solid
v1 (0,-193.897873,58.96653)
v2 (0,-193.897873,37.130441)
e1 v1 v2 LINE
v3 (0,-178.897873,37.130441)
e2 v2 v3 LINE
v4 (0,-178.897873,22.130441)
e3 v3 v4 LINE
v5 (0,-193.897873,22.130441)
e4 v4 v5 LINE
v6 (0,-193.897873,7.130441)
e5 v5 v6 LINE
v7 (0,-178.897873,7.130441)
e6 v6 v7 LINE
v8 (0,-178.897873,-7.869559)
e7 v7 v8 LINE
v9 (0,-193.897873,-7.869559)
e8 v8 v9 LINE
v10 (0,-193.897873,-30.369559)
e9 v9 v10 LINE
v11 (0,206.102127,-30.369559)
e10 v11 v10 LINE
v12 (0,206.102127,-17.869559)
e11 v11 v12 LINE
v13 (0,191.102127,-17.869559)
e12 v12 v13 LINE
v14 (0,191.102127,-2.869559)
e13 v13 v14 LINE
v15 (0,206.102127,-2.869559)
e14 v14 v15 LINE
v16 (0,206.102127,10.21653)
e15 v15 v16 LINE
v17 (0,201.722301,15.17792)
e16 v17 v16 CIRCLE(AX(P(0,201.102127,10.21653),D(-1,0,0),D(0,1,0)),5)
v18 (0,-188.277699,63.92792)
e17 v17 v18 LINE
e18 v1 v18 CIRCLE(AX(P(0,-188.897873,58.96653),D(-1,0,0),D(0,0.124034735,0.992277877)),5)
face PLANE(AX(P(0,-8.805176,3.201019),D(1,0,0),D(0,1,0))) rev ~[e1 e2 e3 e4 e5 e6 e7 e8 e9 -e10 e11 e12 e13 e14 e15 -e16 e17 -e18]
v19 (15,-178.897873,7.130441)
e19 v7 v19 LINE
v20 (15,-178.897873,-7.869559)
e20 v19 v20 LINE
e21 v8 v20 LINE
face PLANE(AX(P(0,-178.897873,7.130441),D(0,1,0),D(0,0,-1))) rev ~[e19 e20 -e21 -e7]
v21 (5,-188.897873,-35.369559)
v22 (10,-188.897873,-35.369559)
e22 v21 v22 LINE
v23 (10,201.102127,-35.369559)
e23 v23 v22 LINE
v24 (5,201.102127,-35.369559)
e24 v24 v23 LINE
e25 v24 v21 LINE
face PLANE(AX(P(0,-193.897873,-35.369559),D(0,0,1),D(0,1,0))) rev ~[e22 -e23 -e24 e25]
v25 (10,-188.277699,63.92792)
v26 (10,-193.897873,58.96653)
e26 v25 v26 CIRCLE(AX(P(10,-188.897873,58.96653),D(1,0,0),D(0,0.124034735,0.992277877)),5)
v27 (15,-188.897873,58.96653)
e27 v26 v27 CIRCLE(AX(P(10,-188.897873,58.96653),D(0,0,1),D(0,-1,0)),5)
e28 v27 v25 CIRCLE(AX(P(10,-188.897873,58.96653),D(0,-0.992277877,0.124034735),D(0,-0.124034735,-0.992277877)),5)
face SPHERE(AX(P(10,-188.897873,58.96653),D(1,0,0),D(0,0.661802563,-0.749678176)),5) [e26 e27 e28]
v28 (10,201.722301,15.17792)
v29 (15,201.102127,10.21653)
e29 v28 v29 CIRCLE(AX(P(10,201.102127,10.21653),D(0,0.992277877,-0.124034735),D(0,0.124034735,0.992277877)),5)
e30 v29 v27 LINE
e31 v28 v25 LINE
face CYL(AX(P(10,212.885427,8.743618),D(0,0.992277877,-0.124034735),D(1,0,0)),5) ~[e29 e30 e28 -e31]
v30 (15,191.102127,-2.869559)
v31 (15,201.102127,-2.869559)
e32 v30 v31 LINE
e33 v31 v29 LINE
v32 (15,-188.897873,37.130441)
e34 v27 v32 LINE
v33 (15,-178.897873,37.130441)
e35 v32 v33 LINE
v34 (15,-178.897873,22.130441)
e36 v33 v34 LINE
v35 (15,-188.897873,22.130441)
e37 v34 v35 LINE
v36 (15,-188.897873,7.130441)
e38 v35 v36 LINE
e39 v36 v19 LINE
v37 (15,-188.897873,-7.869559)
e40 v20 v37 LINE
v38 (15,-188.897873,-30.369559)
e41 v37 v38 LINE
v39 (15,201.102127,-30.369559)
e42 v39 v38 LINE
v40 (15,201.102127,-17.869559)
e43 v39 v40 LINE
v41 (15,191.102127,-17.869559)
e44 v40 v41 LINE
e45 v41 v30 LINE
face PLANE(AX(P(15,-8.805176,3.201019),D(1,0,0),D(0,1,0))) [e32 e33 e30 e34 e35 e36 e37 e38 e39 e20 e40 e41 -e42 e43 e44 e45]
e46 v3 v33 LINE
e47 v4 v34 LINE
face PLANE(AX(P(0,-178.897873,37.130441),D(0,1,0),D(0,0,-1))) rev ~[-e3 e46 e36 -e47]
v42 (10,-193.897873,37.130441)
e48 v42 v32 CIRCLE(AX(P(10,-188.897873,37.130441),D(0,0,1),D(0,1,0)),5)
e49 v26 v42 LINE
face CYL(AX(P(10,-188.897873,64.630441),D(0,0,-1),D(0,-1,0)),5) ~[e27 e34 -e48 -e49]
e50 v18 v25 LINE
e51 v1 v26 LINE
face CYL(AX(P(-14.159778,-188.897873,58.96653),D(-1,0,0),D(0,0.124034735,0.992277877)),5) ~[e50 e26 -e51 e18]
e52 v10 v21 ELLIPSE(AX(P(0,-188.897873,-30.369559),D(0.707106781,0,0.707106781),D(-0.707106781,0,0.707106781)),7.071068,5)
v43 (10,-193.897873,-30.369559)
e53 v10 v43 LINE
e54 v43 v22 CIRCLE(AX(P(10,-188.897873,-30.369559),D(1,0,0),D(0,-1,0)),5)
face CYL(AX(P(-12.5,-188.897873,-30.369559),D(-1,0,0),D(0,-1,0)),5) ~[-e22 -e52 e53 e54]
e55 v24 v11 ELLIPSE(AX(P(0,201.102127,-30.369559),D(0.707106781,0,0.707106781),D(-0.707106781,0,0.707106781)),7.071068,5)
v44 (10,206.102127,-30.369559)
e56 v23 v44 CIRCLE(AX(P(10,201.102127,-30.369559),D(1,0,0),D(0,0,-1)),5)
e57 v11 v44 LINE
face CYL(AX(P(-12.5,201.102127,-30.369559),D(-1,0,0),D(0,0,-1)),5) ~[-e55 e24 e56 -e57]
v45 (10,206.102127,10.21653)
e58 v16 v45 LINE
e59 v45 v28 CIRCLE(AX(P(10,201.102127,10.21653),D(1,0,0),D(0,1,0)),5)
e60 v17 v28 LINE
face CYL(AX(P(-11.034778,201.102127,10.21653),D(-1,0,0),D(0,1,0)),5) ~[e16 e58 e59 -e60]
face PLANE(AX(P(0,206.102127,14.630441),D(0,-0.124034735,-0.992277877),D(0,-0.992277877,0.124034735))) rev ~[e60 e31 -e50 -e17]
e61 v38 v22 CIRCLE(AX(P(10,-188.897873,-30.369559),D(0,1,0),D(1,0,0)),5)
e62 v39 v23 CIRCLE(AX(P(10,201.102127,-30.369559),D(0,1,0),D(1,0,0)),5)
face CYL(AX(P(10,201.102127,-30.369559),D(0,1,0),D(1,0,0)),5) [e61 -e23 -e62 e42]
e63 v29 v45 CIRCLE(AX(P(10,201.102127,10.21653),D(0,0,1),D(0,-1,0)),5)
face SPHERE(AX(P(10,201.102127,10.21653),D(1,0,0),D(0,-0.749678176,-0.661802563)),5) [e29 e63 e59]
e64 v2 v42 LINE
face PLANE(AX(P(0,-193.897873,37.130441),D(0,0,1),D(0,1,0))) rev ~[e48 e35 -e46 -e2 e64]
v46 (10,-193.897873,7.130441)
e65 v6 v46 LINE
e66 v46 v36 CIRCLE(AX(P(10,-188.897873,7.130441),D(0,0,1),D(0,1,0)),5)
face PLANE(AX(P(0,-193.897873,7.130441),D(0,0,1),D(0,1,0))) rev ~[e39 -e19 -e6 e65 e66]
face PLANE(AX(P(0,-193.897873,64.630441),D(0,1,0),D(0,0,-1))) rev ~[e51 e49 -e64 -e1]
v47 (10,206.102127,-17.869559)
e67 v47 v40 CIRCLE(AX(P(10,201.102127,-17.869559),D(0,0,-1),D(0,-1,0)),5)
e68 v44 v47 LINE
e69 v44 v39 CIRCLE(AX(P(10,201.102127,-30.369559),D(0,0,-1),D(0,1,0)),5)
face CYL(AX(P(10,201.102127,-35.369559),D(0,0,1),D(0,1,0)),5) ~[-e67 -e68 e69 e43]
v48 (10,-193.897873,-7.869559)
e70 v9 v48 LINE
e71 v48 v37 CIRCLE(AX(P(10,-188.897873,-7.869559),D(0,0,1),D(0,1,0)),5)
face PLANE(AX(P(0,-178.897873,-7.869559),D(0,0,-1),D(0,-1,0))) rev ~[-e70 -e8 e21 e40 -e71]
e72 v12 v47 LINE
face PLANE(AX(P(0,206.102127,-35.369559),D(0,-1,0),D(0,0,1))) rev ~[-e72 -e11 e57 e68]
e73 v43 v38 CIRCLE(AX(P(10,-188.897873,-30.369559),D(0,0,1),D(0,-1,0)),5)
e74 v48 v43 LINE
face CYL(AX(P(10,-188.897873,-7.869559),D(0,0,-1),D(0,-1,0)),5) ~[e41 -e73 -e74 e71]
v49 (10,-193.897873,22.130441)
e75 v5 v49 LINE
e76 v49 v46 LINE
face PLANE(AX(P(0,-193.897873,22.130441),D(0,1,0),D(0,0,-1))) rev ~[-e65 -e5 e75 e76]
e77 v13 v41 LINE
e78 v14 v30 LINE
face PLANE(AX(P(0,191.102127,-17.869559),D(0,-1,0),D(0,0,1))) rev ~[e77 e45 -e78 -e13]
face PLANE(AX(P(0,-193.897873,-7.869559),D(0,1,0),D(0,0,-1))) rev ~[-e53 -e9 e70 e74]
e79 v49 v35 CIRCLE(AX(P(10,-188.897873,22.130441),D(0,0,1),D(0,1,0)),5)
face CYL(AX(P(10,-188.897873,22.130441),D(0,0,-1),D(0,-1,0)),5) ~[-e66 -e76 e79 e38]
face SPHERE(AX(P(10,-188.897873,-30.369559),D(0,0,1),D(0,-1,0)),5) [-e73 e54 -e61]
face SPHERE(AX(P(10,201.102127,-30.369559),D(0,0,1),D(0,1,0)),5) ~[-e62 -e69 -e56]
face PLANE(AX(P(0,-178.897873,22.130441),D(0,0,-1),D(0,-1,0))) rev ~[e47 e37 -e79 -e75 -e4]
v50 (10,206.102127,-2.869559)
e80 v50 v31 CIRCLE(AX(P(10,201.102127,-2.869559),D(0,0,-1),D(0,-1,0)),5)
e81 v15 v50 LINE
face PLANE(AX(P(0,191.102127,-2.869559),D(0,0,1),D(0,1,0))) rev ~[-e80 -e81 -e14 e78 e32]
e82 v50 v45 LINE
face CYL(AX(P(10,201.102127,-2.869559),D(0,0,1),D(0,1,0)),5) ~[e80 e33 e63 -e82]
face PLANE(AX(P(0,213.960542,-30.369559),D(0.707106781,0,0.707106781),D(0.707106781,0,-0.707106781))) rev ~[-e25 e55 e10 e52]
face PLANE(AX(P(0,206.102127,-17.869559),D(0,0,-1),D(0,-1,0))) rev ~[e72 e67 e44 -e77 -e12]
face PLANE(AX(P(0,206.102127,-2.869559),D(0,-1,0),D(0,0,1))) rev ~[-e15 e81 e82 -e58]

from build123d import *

# Parameters (mm, degrees)
F1_DEPTH     = 15
F2_R         = 5
F3_T1_DEPTH  = 418.0350652296
F4_T1_DEPTH  = 390
F4_T3_DEPTH  = 22.5
F4_T5_DEPTH  = 21.0347777317
F4_T7_DEPTH  = 24.1597777317
F4_T12_DEPTH = 5
F4_T18_DEPTH = 5
F4_T22_ANGLE = 90
F4_T24_ANGLE = 90
F5_T1_DEPTH  = 415.7168298797


# Not quite as in the source:
# - a fillet or chamfer that OpenCascade refuses, or shapes differently, is made with other operations: its cross-section is extruded or revolved along the edge and cut away or added


with BuildPart() as f1:
    # F0 (on Right) → F1 (new body)
    with BuildSketch(Plane.YZ):
        Polygon((-193.8978725672, -35.3695585671), (206.1021274328, -35.3695585671), (206.1021274328, -17.8695585671), (191.1021274328, -17.8695585671), (191.1021274328, -2.8695585671), (206.1021274328, -2.8695585671), (206.1021274328, 14.6304414329), (-193.8978725672, 64.6304414329), (-193.8978725672, 37.1304414329), (-178.8978725672, 37.1304414329), (-178.8978725672, 22.1304414329), (-193.8978725672, 22.1304414329), (-193.8978725672, 7.1304414329), (-178.8978725672, 7.1304414329), (-178.8978725672, -7.8695585671), (-193.8978725672, -7.8695585671), align=None)
    extrude(amount=F1_DEPTH)

    # F2
    f2_edges = [f1.edges().sort_by_distance(p)[0] for p in [
        (15, 206.102127, 5.880441),
        (15, 206.102127, -26.619559),
        (15, -193.897873, -21.619559),
        (15, -193.897873, 14.630441),
        (15, -193.897873, 50.880441),
    ]]
    fillet(f2_edges, radius=F2_R)

    # F3: fillet of radius 5 on 1 edges, made by hand

    # F3_s2 → F3_t1 (cut)
    with BuildSketch(Plane(origin=(0, 208.5341292164, -26.0667661521), x_dir=(1, 0, 0), z_dir=(0, -0.9922778767, 0.1240347346))):
        with BuildLine():
            ThreePointArc((15, 35.0812860348), (13.5355339059, 38.6168199408), (10, 40.0812860348))
            Line((10, 40.0812860348), (15, 40.0812860348))
            Line((15, 40.0812860348), (15, 35.0812860348))
        make_face()
    extrude(amount=F3_T1_DEPTH, mode=Mode.SUBTRACT)

    # F4: fillet of radius 5 on 7 edges, made by hand

    # F4_s2 → F4_t1 (cut)
    with BuildSketch(Plane.XZ.offset(-201.1021274328)):
        with BuildLine():
            ThreePointArc((15, -30.3695585671), (13.5355339059, -33.905092473), (10, -35.3695585671))
            Line((10, -35.3695585671), (15, -35.3695585671))
            Line((15, -35.3695585671), (15, -30.3695585671))
        make_face()
    extrude(amount=F4_T1_DEPTH, mode=Mode.SUBTRACT)

    # F4_s4 → F4_t3 (cut)
    with BuildSketch(Plane.YZ.offset(-12.5)):
        with BuildLine():
            ThreePointArc((-193.8978725672, -30.3695585671), (-192.4334064731, -33.905092473), (-188.8978725672, -35.3695585671))
            Line((-188.8978725672, -35.3695585671), (-193.8978725672, -35.3695585671))
            Line((-193.8978725672, -35.3695585671), (-193.8978725672, -30.3695585671))
        make_face()
        with BuildLine():
            ThreePointArc((201.1021274328, -35.3695585671), (204.6376613388, -33.905092473), (206.1021274328, -30.3695585671))
            Line((206.1021274328, -30.3695585671), (206.1021274328, -35.3695585671))
            Line((206.1021274328, -35.3695585671), (201.1021274328, -35.3695585671))
        make_face()
    extrude(amount=F4_T3_DEPTH, mode=Mode.SUBTRACT)

    # F4_s6 → F4_t5 (cut)
    with BuildSketch(Plane.YZ.offset(-11.0347777317)):
        with BuildLine():
            ThreePointArc((206.1021274328, 10.2165303402), (204.8505183119, 13.5255431564), (201.7223011058, 15.1779197238))
            Line((201.7223011058, 15.1779197238), (206.1021274328, 14.6304414329))
            Line((206.1021274328, 14.6304414329), (206.1021274328, 10.2165303402))
        make_face()
    extrude(amount=F4_T5_DEPTH, mode=Mode.SUBTRACT)

    # F4_s8 → F4_t7 (cut)
    with BuildSketch(Plane.YZ.offset(-14.1597777317)):
        with BuildLine():
            ThreePointArc((-188.2776988942, 63.9279197238), (-192.2068853834, 62.7149212193), (-193.8978725672, 58.9665303402))
            Line((-193.8978725672, 58.9665303402), (-193.8978725672, 64.6304414329))
            Line((-193.8978725672, 64.6304414329), (-188.2776988942, 63.9279197238))
        make_face()
    extrude(amount=F4_T7_DEPTH, mode=Mode.SUBTRACT)


with BuildPart() as f4_tool10:
    # F4_s11 → F4_t12 (new body)
    with BuildSketch(Plane.YZ.offset(10)):
        Polygon((-188.8978725672, 58.9665303402), (-188.2776988942, 63.9279197238), (-193.8978725672, 64.6304414329), (-193.8978725672, 58.9665303402), align=None)
    extrude(amount=F4_T12_DEPTH)

    # F4_s13 → F4_t14 (revolve, cut)
    with BuildSketch(Plane(origin=(10, -188.8978725672, 58.9665303402), x_dir=(0, 0.6618025632, -0.7496781758), z_dir=(0, -0.7496781758, -0.6618025632))):
        with BuildLine():
            ThreePointArc((0, -5), (5, 0), (0, 5))
            Line((0, 5), (0, -5))
        make_face()
    revolve(axis=Axis((10, -188.8978725672, 58.9665303402), (1, 0, 0)), mode=Mode.SUBTRACT)


with BuildPart() as f1_1:
    add(f1.part)

    # F4_t9: cut F4_tool10
    add(f4_tool10.part, mode=Mode.SUBTRACT)


with BuildPart() as f4_tool16:
    # F4_s17 → F4_t18 (new body)
    with BuildSketch(Plane.YZ.offset(10)):
        Polygon((201.1021274328, 10.2165303402), (206.1021274328, 10.2165303402), (206.1021274328, 14.6304414329), (201.7223011058, 15.1779197238), align=None)
    extrude(amount=F4_T18_DEPTH)

    # F4_s19 → F4_t20 (revolve, cut)
    with BuildSketch(Plane(origin=(10, 201.1021274328, 10.2165303402), x_dir=(0, -0.7496781758, -0.6618025632), z_dir=(0, -0.6618025632, 0.7496781758))):
        with BuildLine():
            ThreePointArc((0, -5), (5, 0), (0, 5))
            Line((0, 5), (0, -5))
        make_face()
    revolve(axis=Axis((10, 201.1021274328, 10.2165303402), (1, 0, 0)), mode=Mode.SUBTRACT)


with BuildPart() as f1_2:
    add(f1_1.part)

    # F4_t15: cut F4_tool16
    add(f4_tool16.part, mode=Mode.SUBTRACT)

    # F4_s21 → F4_t22 (revolve, cut)
    with BuildSketch(Plane.YZ.offset(10)):
        with BuildLine():
            ThreePointArc((-188.8978725672, -35.3695585671), (-192.4334064731, -33.905092473), (-193.8978725672, -30.3695585671))
            Line((-193.8978725672, -30.3695585671), (-193.8978725672, -35.3695585671))
            Line((-193.8978725672, -35.3695585671), (-188.8978725672, -35.3695585671))
        make_face()
    revolve(axis=Axis((10, -188.8978725672, -35.3695585671), (0, 0, 1)), revolution_arc=F4_T22_ANGLE, mode=Mode.SUBTRACT)

    # F4_s23 → F4_t24 (revolve, cut)
    with BuildSketch(Plane.YZ.offset(10)):
        with BuildLine():
            ThreePointArc((201.1021274328, -35.3695585671), (204.6376613388, -33.905092473), (206.1021274328, -30.3695585671))
            Line((206.1021274328, -30.3695585671), (206.1021274328, -35.3695585671))
            Line((206.1021274328, -35.3695585671), (201.1021274328, -35.3695585671))
        make_face()
    revolve(axis=Axis((10, 201.1021274328, -35.3695585671), (0, 0, -1)), revolution_arc=F4_T24_ANGLE, mode=Mode.SUBTRACT)

    # F5: chamfer of 5 on 1 edges, made by hand

    # F5_s2 → F5_t1 (cut)
    with BuildSketch(Plane.XZ.offset(-213.9605423726)):
        Polygon((0, -30.3695585671), (5, -35.3695585671), (0, -35.3695585671), align=None)
    extrude(amount=F5_T1_DEPTH, mode=Mode.SUBTRACT)


solid = f1_2.part
